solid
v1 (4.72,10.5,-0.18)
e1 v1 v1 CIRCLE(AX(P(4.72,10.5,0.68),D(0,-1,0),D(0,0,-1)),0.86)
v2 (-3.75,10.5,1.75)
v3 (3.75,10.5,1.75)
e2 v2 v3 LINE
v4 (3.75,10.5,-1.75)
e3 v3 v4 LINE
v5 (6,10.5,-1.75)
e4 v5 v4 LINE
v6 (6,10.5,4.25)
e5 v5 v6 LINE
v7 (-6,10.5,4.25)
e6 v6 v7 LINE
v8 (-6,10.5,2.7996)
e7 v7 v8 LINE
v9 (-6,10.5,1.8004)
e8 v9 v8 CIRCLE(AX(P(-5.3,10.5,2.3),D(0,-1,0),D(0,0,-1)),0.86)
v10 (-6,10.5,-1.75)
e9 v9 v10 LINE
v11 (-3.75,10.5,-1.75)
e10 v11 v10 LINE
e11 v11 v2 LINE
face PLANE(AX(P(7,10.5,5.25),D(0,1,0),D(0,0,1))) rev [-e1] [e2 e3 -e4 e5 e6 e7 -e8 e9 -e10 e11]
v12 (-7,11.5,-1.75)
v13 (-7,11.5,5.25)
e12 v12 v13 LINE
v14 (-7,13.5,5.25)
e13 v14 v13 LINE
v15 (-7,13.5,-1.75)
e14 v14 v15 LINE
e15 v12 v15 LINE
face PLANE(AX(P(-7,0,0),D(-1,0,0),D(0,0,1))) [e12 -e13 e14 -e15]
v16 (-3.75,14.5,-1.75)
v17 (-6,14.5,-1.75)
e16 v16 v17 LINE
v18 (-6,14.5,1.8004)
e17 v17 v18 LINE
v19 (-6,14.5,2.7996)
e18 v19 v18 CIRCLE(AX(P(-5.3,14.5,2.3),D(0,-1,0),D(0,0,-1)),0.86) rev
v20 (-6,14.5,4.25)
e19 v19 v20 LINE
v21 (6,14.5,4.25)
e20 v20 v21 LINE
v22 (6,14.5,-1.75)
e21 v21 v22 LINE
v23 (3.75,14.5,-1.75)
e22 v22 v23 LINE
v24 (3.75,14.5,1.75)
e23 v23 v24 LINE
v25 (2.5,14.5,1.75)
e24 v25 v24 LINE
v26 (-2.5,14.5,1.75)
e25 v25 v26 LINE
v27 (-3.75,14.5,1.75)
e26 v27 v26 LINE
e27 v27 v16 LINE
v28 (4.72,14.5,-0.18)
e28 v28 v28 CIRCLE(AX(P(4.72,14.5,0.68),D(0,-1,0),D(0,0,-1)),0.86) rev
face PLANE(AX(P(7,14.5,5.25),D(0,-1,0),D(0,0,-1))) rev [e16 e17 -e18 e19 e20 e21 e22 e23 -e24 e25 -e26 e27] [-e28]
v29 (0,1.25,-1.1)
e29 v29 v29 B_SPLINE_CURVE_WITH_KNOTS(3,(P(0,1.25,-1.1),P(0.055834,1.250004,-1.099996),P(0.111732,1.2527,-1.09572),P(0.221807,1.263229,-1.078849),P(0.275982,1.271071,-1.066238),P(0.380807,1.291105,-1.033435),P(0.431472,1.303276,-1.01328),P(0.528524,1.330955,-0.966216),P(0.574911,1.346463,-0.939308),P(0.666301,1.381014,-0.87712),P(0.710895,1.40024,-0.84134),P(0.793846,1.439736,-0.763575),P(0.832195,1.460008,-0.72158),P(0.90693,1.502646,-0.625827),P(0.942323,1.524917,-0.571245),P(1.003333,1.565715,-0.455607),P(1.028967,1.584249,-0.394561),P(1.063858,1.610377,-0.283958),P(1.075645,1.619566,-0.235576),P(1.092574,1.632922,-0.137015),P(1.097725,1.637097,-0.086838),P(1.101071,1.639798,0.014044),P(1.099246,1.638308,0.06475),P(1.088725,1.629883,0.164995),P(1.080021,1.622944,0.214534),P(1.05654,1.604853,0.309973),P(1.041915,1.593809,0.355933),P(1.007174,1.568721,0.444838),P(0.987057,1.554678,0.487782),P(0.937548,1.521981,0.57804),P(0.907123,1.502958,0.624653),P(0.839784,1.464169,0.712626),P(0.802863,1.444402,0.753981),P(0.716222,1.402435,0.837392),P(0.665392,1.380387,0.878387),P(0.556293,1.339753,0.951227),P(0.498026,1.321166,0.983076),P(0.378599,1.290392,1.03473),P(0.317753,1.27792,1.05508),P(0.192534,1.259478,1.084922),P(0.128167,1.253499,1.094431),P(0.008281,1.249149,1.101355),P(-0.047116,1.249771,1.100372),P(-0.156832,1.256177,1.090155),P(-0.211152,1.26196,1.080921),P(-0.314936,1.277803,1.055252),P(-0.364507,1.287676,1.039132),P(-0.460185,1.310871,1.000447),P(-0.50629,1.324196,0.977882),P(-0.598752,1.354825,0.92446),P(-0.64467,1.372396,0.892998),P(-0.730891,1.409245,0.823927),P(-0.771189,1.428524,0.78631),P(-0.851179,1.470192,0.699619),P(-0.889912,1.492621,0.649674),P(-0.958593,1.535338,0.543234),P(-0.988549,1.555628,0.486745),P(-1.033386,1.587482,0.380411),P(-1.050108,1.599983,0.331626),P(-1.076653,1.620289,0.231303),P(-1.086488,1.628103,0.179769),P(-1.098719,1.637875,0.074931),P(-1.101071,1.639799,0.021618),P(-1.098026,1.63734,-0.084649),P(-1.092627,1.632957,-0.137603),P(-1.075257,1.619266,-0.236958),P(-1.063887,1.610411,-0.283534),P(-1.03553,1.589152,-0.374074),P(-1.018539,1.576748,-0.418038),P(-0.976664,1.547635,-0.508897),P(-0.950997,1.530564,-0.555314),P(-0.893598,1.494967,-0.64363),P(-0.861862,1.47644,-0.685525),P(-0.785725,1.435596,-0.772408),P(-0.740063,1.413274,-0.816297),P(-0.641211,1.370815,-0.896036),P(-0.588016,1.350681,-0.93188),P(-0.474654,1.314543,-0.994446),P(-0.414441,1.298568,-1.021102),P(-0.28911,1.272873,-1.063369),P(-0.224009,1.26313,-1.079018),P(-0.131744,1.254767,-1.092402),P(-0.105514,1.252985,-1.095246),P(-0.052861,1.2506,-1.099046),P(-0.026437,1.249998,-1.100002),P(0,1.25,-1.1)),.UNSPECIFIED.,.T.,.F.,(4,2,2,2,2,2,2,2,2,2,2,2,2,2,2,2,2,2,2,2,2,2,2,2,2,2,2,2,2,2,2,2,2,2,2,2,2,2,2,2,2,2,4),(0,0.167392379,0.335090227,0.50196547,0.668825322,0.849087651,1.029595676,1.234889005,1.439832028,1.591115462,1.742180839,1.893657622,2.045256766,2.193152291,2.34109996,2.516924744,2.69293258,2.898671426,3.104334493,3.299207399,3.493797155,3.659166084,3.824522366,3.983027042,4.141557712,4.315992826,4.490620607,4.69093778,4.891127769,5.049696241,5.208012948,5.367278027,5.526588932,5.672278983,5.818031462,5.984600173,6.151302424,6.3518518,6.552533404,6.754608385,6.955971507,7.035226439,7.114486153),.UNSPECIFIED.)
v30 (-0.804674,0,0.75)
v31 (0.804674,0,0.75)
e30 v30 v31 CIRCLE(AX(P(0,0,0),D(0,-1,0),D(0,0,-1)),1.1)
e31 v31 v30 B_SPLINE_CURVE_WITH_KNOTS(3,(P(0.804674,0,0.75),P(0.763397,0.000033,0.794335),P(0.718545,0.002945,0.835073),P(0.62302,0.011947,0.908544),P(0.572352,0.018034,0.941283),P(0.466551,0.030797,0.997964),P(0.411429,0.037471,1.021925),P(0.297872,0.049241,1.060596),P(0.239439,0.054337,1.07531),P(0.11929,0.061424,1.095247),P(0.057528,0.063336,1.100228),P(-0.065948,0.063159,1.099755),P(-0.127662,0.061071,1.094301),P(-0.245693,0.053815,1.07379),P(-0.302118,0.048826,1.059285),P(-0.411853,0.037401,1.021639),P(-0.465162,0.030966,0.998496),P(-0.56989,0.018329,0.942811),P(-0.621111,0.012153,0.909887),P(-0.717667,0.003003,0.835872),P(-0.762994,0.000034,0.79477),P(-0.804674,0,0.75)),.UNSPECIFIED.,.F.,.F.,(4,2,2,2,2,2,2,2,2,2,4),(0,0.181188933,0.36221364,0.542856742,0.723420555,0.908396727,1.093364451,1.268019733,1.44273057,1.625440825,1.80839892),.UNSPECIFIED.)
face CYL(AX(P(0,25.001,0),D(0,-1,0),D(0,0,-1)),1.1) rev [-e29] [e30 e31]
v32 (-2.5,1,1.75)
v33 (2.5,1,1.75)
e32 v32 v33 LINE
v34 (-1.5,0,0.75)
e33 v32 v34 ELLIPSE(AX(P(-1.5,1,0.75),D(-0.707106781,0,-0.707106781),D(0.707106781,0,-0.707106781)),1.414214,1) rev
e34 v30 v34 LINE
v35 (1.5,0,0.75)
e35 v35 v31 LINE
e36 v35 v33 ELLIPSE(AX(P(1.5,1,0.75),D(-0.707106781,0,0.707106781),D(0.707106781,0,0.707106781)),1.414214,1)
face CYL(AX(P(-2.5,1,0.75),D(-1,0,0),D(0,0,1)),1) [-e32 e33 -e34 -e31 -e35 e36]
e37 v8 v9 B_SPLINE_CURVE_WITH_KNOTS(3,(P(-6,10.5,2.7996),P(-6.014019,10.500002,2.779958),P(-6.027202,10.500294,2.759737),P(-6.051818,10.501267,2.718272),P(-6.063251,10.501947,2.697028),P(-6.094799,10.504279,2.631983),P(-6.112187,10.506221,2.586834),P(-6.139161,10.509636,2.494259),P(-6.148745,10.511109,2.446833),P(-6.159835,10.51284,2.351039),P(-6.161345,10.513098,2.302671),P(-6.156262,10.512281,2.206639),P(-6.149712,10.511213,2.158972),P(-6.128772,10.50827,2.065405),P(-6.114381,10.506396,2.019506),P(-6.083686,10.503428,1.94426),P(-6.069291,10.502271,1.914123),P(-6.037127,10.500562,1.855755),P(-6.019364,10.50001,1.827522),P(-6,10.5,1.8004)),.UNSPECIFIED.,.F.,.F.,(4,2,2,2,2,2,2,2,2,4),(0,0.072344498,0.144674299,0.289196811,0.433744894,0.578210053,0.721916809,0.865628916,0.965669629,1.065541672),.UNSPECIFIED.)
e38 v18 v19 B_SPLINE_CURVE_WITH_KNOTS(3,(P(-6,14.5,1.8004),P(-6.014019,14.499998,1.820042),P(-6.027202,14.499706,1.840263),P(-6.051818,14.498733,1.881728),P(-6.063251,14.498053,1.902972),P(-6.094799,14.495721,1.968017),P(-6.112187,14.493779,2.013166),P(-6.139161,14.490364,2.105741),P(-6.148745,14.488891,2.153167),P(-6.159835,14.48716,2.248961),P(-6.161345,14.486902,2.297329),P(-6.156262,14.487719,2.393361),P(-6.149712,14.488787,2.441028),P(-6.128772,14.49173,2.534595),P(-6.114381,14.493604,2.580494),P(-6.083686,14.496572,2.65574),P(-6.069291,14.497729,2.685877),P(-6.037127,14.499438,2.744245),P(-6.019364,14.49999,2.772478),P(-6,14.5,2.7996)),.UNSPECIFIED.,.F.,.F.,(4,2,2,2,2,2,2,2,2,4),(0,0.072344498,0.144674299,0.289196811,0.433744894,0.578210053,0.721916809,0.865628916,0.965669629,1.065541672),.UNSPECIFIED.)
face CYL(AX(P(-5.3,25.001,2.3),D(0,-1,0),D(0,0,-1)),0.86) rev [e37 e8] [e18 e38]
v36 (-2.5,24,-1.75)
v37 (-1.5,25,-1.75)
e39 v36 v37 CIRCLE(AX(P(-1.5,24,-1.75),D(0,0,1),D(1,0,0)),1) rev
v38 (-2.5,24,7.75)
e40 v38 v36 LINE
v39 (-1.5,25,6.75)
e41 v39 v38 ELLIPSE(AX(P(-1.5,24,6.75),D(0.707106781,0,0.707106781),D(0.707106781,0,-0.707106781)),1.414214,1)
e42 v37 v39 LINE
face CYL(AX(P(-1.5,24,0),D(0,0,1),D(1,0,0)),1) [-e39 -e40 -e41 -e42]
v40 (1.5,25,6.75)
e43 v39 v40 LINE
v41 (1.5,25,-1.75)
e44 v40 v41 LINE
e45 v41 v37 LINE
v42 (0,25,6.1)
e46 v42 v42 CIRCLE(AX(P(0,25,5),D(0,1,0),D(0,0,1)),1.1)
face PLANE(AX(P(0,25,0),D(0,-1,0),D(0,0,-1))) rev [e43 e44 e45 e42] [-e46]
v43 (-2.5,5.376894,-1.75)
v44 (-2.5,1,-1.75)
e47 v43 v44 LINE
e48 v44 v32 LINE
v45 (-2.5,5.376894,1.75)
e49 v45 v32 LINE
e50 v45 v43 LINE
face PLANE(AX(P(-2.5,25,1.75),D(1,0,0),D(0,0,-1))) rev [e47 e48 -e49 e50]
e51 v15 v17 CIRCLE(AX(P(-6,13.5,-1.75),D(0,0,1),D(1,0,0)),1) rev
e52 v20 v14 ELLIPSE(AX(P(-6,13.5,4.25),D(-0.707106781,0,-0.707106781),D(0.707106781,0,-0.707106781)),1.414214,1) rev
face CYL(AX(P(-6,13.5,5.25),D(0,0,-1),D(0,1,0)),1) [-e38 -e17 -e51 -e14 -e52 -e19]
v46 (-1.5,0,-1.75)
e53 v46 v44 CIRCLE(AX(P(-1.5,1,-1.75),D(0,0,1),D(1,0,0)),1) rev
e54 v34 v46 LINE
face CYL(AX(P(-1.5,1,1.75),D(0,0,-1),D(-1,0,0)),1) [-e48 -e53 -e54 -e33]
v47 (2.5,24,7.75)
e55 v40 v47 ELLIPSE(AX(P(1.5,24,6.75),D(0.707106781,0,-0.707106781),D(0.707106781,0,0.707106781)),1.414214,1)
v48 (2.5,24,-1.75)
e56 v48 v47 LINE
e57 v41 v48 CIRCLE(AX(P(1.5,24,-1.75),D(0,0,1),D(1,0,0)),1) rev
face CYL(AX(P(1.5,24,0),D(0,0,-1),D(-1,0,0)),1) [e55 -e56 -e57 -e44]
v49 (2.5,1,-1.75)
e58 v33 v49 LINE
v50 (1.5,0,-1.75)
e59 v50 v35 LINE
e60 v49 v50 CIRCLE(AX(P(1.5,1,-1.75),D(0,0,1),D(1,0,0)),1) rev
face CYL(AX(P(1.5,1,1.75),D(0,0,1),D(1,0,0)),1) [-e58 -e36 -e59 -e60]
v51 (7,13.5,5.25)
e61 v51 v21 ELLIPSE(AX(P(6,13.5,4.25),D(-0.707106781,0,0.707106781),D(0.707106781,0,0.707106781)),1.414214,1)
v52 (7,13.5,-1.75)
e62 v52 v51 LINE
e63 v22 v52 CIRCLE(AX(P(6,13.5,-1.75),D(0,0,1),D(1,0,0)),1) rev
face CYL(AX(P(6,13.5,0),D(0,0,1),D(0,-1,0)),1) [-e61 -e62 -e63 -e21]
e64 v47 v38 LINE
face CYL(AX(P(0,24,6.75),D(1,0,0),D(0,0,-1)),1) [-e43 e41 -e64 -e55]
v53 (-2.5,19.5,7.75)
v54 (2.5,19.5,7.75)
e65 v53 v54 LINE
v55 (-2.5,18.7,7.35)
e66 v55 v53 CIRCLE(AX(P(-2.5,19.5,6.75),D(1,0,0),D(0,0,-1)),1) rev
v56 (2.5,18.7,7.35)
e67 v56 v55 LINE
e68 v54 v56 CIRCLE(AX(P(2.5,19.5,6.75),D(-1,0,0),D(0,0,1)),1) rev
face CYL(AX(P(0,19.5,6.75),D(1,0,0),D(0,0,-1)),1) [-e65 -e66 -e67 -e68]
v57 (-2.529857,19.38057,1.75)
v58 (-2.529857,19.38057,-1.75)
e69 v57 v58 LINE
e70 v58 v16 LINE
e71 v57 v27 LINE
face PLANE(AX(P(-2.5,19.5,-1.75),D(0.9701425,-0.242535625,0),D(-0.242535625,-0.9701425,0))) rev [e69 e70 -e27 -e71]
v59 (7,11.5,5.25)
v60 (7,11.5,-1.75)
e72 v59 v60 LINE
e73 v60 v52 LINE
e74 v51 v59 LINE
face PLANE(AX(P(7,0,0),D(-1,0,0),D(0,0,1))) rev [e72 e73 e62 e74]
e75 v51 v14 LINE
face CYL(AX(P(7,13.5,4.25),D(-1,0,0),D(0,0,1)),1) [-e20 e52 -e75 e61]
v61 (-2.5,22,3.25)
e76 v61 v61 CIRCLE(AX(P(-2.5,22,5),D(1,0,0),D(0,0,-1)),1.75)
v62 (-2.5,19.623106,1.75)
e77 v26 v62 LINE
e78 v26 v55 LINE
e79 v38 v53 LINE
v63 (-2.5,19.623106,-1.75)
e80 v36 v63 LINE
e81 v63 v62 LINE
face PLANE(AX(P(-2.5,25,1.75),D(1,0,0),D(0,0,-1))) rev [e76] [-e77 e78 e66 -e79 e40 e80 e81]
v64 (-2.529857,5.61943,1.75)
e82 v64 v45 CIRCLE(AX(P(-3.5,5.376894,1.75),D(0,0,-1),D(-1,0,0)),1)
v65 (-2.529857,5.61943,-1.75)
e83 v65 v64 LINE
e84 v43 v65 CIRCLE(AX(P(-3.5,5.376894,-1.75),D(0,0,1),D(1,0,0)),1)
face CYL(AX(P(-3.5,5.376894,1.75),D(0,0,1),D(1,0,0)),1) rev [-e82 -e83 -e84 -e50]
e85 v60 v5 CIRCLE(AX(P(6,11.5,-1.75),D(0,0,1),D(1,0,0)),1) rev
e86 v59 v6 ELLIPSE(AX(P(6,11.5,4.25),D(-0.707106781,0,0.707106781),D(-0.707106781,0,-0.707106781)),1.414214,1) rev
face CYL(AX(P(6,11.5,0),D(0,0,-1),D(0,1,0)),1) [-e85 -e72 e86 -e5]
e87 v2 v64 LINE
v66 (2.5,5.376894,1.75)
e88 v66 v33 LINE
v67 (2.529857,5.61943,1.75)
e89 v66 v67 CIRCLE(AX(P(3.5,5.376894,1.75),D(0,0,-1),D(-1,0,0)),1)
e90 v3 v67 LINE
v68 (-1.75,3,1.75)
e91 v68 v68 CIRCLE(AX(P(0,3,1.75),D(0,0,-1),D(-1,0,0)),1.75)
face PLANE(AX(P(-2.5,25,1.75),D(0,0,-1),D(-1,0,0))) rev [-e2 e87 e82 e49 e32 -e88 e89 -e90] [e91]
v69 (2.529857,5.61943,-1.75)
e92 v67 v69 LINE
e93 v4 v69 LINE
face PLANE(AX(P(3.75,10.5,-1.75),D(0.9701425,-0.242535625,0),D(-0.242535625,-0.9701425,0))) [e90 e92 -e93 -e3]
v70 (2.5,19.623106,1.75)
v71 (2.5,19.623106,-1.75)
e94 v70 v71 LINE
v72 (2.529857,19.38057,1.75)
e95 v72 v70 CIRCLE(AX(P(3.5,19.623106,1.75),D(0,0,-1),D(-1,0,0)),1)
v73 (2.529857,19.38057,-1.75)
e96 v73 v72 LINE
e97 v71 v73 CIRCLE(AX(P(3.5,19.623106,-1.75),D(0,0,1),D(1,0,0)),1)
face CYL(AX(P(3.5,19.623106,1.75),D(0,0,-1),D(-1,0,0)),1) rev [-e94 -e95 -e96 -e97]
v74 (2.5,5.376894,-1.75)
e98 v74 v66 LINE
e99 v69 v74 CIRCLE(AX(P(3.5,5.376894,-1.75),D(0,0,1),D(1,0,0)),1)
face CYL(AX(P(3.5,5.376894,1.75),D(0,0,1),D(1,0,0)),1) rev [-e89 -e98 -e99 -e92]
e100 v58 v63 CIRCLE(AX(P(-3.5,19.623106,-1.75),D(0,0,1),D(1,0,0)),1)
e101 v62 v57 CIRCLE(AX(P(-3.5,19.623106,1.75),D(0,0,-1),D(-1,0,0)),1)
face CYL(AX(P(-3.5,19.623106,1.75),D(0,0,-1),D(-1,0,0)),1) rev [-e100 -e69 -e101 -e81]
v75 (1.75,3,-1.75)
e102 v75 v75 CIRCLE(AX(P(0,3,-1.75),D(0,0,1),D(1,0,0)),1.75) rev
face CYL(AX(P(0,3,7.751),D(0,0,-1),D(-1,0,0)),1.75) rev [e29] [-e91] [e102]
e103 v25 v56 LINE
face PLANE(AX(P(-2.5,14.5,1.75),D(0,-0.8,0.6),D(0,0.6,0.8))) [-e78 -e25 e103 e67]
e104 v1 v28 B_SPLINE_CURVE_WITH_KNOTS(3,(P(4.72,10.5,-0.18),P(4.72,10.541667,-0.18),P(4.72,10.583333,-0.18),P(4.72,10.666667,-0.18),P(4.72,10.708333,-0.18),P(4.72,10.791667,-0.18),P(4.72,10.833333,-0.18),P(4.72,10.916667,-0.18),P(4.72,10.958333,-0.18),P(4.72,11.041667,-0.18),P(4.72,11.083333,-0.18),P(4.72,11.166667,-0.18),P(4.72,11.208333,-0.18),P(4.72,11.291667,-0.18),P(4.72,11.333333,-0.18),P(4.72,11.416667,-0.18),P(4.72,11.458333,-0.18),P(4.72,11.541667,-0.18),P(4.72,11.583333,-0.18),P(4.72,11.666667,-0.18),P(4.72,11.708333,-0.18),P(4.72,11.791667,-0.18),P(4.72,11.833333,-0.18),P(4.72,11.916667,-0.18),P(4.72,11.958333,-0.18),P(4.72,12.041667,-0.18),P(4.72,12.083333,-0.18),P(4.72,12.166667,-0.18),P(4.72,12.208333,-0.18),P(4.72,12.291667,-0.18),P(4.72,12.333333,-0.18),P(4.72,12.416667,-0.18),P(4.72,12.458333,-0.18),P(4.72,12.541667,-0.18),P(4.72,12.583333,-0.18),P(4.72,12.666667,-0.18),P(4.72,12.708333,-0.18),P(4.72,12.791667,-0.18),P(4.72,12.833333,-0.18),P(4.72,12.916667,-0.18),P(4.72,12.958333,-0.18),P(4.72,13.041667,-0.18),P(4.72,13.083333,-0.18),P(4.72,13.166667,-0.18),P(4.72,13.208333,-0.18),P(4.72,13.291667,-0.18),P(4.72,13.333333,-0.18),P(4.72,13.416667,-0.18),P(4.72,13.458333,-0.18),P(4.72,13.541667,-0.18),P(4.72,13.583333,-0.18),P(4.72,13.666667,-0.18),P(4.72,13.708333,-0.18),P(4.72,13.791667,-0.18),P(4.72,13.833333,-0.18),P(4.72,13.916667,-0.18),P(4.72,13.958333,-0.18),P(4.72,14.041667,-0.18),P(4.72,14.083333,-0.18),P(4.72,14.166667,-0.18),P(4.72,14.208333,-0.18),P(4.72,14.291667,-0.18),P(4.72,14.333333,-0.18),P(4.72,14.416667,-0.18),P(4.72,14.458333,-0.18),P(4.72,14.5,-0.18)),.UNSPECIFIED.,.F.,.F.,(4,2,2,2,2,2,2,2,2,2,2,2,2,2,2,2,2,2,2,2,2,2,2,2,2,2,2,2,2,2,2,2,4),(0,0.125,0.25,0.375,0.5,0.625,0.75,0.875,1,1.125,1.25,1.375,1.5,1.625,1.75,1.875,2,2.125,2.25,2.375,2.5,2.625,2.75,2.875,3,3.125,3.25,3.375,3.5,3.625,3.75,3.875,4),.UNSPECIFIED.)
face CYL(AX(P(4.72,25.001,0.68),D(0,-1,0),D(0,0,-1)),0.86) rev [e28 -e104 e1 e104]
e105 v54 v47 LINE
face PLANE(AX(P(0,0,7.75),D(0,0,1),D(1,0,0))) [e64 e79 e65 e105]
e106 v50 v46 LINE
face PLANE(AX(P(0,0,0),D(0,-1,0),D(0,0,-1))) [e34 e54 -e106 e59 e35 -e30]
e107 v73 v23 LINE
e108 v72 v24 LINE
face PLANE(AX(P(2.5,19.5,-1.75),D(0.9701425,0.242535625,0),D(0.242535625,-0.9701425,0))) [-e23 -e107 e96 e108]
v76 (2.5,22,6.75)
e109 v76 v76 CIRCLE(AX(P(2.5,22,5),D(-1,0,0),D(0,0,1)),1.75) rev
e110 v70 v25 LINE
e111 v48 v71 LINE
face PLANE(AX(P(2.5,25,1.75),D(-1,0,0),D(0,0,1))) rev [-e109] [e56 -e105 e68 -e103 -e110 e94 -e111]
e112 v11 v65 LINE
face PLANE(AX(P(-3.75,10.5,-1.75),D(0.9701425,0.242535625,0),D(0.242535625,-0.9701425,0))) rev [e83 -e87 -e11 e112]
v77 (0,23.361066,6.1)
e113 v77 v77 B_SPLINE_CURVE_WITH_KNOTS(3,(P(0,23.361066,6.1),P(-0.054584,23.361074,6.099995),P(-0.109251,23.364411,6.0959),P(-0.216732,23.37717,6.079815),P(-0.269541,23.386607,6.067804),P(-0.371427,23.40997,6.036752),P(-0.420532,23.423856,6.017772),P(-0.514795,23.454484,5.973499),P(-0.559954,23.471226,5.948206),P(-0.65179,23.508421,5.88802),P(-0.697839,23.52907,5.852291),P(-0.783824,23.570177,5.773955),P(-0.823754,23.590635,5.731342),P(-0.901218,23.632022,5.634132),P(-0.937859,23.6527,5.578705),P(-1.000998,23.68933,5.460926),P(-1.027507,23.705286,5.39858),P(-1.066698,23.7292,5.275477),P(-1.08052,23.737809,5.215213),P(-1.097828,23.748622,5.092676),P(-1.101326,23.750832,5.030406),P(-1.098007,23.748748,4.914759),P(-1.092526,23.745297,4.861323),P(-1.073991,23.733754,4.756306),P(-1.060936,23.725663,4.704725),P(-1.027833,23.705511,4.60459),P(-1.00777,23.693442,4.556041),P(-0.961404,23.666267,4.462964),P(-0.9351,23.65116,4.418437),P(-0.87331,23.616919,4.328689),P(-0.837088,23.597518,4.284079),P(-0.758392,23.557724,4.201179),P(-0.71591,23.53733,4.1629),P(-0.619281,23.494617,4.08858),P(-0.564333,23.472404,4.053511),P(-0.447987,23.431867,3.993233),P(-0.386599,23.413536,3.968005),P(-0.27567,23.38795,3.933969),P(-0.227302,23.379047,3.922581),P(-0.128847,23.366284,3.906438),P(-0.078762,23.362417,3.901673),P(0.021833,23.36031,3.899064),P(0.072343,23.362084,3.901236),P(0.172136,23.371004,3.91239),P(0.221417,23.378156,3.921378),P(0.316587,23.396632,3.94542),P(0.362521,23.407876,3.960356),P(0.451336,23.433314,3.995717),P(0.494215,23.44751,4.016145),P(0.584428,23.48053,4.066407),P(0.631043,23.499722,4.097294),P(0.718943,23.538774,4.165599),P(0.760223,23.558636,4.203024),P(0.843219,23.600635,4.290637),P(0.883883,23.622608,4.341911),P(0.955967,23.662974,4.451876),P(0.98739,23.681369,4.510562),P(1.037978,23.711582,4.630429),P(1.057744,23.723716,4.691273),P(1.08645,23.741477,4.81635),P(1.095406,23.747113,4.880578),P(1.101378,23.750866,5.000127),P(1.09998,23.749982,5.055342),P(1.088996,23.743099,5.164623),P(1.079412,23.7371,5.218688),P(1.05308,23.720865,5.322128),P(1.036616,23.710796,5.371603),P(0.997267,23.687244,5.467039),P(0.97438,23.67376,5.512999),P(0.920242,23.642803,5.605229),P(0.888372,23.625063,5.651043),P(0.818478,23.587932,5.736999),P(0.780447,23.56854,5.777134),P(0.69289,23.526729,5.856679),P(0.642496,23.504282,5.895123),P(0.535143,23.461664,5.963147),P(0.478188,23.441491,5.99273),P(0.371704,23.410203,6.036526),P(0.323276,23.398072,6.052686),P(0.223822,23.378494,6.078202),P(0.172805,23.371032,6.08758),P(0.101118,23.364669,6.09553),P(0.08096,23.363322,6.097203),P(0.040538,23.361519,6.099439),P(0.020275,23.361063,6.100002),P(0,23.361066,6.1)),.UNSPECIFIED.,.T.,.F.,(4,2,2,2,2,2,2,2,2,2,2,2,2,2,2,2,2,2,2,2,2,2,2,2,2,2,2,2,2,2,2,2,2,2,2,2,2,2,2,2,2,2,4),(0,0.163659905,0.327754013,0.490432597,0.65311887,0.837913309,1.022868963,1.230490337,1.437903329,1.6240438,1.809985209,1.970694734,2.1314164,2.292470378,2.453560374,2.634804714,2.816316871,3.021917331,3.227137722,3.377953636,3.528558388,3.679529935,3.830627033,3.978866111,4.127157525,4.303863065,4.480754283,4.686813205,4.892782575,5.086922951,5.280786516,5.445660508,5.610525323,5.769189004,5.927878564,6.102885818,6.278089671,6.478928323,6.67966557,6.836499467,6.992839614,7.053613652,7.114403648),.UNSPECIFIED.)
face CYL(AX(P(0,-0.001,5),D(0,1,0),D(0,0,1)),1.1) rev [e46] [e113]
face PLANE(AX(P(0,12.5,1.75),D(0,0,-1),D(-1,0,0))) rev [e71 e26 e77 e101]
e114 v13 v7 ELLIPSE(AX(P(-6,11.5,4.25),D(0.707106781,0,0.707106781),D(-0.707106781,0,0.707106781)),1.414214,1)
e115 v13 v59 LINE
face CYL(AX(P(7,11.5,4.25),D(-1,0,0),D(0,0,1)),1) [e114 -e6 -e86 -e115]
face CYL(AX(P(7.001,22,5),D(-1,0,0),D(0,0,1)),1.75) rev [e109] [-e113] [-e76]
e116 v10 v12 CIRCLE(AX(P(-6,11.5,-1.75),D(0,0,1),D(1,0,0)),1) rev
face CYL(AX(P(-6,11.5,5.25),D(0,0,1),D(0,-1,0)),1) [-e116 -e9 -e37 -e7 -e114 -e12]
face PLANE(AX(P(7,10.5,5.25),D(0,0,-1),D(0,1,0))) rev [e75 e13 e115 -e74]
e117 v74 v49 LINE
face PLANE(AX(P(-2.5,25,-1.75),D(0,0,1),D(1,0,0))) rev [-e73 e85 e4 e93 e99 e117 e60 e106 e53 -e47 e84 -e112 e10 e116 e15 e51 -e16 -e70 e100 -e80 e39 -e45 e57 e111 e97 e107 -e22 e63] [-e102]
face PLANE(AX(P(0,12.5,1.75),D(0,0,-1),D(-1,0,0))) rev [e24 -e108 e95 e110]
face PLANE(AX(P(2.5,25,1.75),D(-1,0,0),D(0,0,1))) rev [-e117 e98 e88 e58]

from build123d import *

# Parameters (mm, degrees)
SKETCH4_W                      = 5
SKETCH4_H                      = 3.5
BOSS_EXTRUDE4_DEPTH            = 25
SKETCH8_W                      = 5
SKETCH8_H                      = 6
BOSS_EXTRUDE6_DEPTH            = 6
BOSS_EXTRUDE8_DEPTH            = 7
BOSS_EXTRUDE8_DEPTH_BACK       = 7
SKETCH10_W                     = 7
SKETCH10_H                     = 4
CUT_EXTRUDE1_REACH             = 19.869
SKETCH11_R                     = 0.86
CUT_EXTRUDE3_REACH             = 29.094
SKETCH5_R                      = 1.75
CUT_EXTRUDE3_DIRECTION_2_REACH = 29.094
CUT_EXTRUDE2_REACH             = 29.094
SKETCH9_R                      = 1.75
CUT_EXTRUDE2_DIRECTION_2_REACH = 29.094
CUT_EXTRUDE4_REACH             = 29.094
CUT_EXTRUDE4_END_RADIUS        = 1.75
SKETCH13_R                     = 1.1
CUT_EXTRUDE5_REACH             = 29.094
CUT_EXTRUDE5_END_RADIUS        = 1.75
SKETCH14_R                     = 1.1
RIB5_REACH                     = 29.844
SKETCH19_WALL_W                = 65.188868008
SKETCH19_WALL_H                = 5
RIB8_REACH                     = 29.645
SKETCH20_WALL_W                = 62.444026
SKETCH20_WALL_H                = 3.5
RIB9_REACH                     = 29.645
SKETCH21_WALL_W                = 62.444026
SKETCH21_WALL_H                = 3.5
FILLET2_R                      = 1


with BuildPart() as part:
    # Sketch4 → Boss-Extrude4 (new body)
    with BuildSketch(Plane(origin=(0, 0, 0), x_dir=(1, 0, 0), z_dir=(0, 1, 0))):
        Rectangle(SKETCH4_W, SKETCH4_H)
    extrude(amount=BOSS_EXTRUDE4_DEPTH)

    # Sketch8 → Boss-Extrude6 (add)
    with BuildSketch(Plane.XY.offset(1.75)):
        with Locations((0, 22)):
            Rectangle(SKETCH8_W, SKETCH8_H)
    extrude(amount=BOSS_EXTRUDE6_DEPTH)

    # Sketch10 → Boss-Extrude8 (add, two sides: drawn at the far end of the back side and taken through both)
    with BuildSketch(Plane(origin=(0, 0, 0), x_dir=(0, 0, -1), z_dir=(1, 0, 0)).offset(-BOSS_EXTRUDE8_DEPTH_BACK)):
        with Locations((-1.75, 12.5)):
            Rectangle(SKETCH10_W, SKETCH10_H)
    extrude(amount=BOSS_EXTRUDE8_DEPTH + BOSS_EXTRUDE8_DEPTH_BACK)

    # Sketch11 → Cut-Extrude1 (cut, up to next)
    with BuildSketch(Plane.XZ.offset(-10.5), mode=Mode.PRIVATE) as cut_extrude1_sk1:
        with Locations(Location((-5.3, 2.3, 0), (0, 0, 270))):
            Circle(SKETCH11_R)
    cut_extrude1_tool1 = extrude(cut_extrude1_sk1.sketch, amount=-CUT_EXTRUDE1_REACH, mode=Mode.PRIVATE) & part.part
    # Sketch11 → Cut-Extrude1 (cut, up to next)
    with BuildSketch(Plane.XZ.offset(-10.5), mode=Mode.PRIVATE) as cut_extrude1_sk2:
        with Locations(Location((4.72, 0.68, 0), (0, 0, 270))):
            Circle(SKETCH11_R)
    cut_extrude1_tool2 = extrude(cut_extrude1_sk2.sketch, amount=-CUT_EXTRUDE1_REACH, mode=Mode.PRIVATE) & part.part
    add(cut_extrude1_tool1.solids().sort_by_distance((-5.3, 10.5, 2.3))[0], mode=Mode.SUBTRACT)
    add(cut_extrude1_tool2.solids().sort_by_distance((4.72, 10.5, 0.68))[0], mode=Mode.SUBTRACT)

    # Sketch5 → Cut-Extrude3 (cut, up to next)
    with BuildSketch(Plane.XY, mode=Mode.PRIVATE) as cut_extrude3_sk1:
        with Locations(Location((0, 3, 0), (0, 0, 180))):
            Circle(SKETCH5_R)
    cut_extrude3_tool1 = extrude(cut_extrude3_sk1.sketch, amount=-CUT_EXTRUDE3_REACH, mode=Mode.PRIVATE) & part.part
    add(cut_extrude3_tool1.solids().sort_by_distance((0, 3, 0))[0], mode=Mode.SUBTRACT)

    # Sketch5 → Cut-Extrude3 direction 2 (cut, up to next)
    with BuildSketch(Plane.XY, mode=Mode.PRIVATE) as cut_extrude3_direction_2_sk1:
        with Locations(Location((0, 3, 0), (0, 0, 180))):
            Circle(SKETCH5_R)
    cut_extrude3_direction_2_tool1 = extrude(cut_extrude3_direction_2_sk1.sketch, amount=CUT_EXTRUDE3_DIRECTION_2_REACH, mode=Mode.PRIVATE) & part.part
    add(cut_extrude3_direction_2_tool1.solids().sort_by_distance((0, 3, 0))[0], mode=Mode.SUBTRACT)

    # Sketch9 → Cut-Extrude2 (cut, up to next)
    with BuildSketch(Plane.ZY, mode=Mode.PRIVATE) as cut_extrude2_sk1:
        with Locations((5, 22)):
            Circle(SKETCH9_R)
    cut_extrude2_tool1 = extrude(cut_extrude2_sk1.sketch, amount=CUT_EXTRUDE2_REACH, mode=Mode.PRIVATE) & part.part
    add(cut_extrude2_tool1.solids().sort_by_distance((0, 22, 5))[0], mode=Mode.SUBTRACT)

    # Sketch9 → Cut-Extrude2 direction 2 (cut, up to next)
    with BuildSketch(Plane.ZY, mode=Mode.PRIVATE) as cut_extrude2_direction_2_sk1:
        with Locations((5, 22)):
            Circle(SKETCH9_R)
    cut_extrude2_direction_2_tool1 = extrude(cut_extrude2_direction_2_sk1.sketch, amount=-CUT_EXTRUDE2_DIRECTION_2_REACH, mode=Mode.PRIVATE) & part.part
    add(cut_extrude2_direction_2_tool1.solids().sort_by_distance((0, 22, 5))[0], mode=Mode.SUBTRACT)

    # Cut-Extrude4: up to this cylinder (the profile starts outside it)
    cut_extrude4_end = Plane(origin=(0, 22, 5), z_dir=(-1, 0, 0)) * Cylinder(CUT_EXTRUDE4_END_RADIUS, 62.688, mode=Mode.PRIVATE)
    # Sketch13 → Cut-Extrude4 (cut, up to the surface)
    with BuildSketch(Plane(origin=(0, 25, 0), x_dir=(1, 0, 0), z_dir=(0, 1, 0)), mode=Mode.PRIVATE) as cut_extrude4_sk1:
        with Locations(Location((0, -5, 0), (0, 0, 270))):
            Circle(SKETCH13_R)
    cut_extrude4_tool1 = extrude(cut_extrude4_sk1.sketch, amount=-CUT_EXTRUDE4_REACH, mode=Mode.PRIVATE) - cut_extrude4_end
    add(cut_extrude4_tool1.solids().sort_by_distance((0, 25, 5))[0], mode=Mode.SUBTRACT)

    # Cut-Extrude5: up to this cylinder (the profile starts outside it)
    cut_extrude5_end = Plane(origin=(0, 3, 0), z_dir=(0, 0, -1)) * Cylinder(CUT_EXTRUDE5_END_RADIUS, 62.688, mode=Mode.PRIVATE)
    # Sketch14 → Cut-Extrude5 (cut, up to the surface)
    with BuildSketch(Plane.XZ, mode=Mode.PRIVATE) as cut_extrude5_sk1:
        with Locations(Location((0, 0, 0), (0, 0, 270))):
            Circle(SKETCH14_R)
    cut_extrude5_tool1 = extrude(cut_extrude5_sk1.sketch, amount=-CUT_EXTRUDE5_REACH, mode=Mode.PRIVATE) - cut_extrude5_end
    add(cut_extrude5_tool1.solids().sort_by_distance((0, 0, 0))[0], mode=Mode.SUBTRACT)

    # Sketch19 wall → Rib5 (add, up to next)
    with BuildSketch(Plane(origin=(-2.5, 16.75, 4.75), x_dir=(0, 0.6, 0.8), z_dir=(0, 0.8, -0.6)), mode=Mode.PRIVATE) as rib5_sk1:
        with Locations((0, 2.5)):
            Rectangle(SKETCH19_WALL_W, SKETCH19_WALL_H)
    rib5_tool1 = extrude(rib5_sk1.sketch, amount=RIB5_REACH, mode=Mode.PRIVATE) - part.part
    add(rib5_tool1.solids().sort_by_distance((-2.5, 16.75, 4.75))[0])

    # Sketch20 wall → Rib8 (add, up to next)
    with BuildSketch(Plane(origin=(-3.125, 17, -1.75), x_dir=(-0.242535625036, -0.970142500145, 0), z_dir=(-0.970142500145, 0.242535625036, 0)), mode=Mode.PRIVATE) as rib8_sk1:
        with Locations((0, 1.75)):
            Rectangle(SKETCH20_WALL_W, SKETCH20_WALL_H)
    rib8_tool1 = extrude(rib8_sk1.sketch, amount=-RIB8_REACH, mode=Mode.PRIVATE) - part.part
    rib8 = rib8_tool1.solids().sort_by_distance((-3.125, 17, -1.75))[0]
    add(rib8)

    # Sketch21 wall → Rib9 (add, up to next)
    with BuildSketch(Plane(origin=(-3.125, 8, -1.75), x_dir=(0.242535625036, -0.970142500145, 0), z_dir=(-0.970142500145, -0.242535625036, 0)), mode=Mode.PRIVATE) as rib9_sk1:
        with Locations((0, 1.75)):
            Rectangle(SKETCH21_WALL_W, SKETCH21_WALL_H)
    rib9_tool1 = extrude(rib9_sk1.sketch, amount=-RIB9_REACH, mode=Mode.PRIVATE) - part.part
    rib9 = rib9_tool1.solids().sort_by_distance((-3.125, 8, -1.75))[0]
    add(rib9)

    # Mirror3: Rib8, Rib9 across plane
    add(rib8.mirror(Plane(origin=(0, 0, 0), x_dir=(0, 0, 1), z_dir=(1, 0, 0))))
    add(rib9.mirror(Plane(origin=(0, 0, 0), x_dir=(0, 0, 1), z_dir=(1, 0, 0))))

    # Fillet2
    # the kernel refuses this fillet: 1 mm, written as the material it adds along each edge
    with BuildSketch(Plane(origin=(-2.5, 19.5, 1.75), x_dir=(-0.2425356250360274, -0.9701425001454083, 0), z_dir=(0, 0, -1)), Plane(origin=(-2.5, 5.5, -1.75), x_dir=(-0.24253562503611567, 0.9701425001453862, 0), z_dir=(0, 0, 1)), Plane(origin=(2.5, 5.5, -1.75), x_dir=(0, -1, 0), z_dir=(0, 0, 1))) as fillet2_piece_1:
        with BuildLine():
            CenterArc((FILLET2_R * 0.123105625617, FILLET2_R), FILLET2_R, 255.963756532, 14.036243468)
            Line((-FILLET2_R * 0.119429999419, FILLET2_R * 0.0298574998546), (0, 0))
            Line((0, 0), (FILLET2_R * 0.123105625618, 0))
        make_face()
    fillet2_piece_1_solid = extrude(amount=3.5, mode=Mode.PRIVATE)
    with BuildSketch(Plane(origin=(2.5, 19.5, 1.75), x_dir=(0.24253562503603418, -0.9701425001454065, 0), z_dir=(0, 0, -1))) as fillet2_piece_2:
        with BuildLine():
            CenterArc((FILLET2_R * 0.123105625617, -FILLET2_R), FILLET2_R, 90, 14.036243468)
            Line((-FILLET2_R * 0.119429999419, -FILLET2_R * 0.0298574998546), (0, 0))
            Line((0, 0), (FILLET2_R * 0.123105625618, 0))
        make_face()
    fillet2_piece_2_solid = extrude(amount=3.5, mode=Mode.PRIVATE)
    add([fillet2_piece_1_solid, fillet2_piece_2_solid])
    # the kernel refuses this fillet: 1 mm, written as the material it takes off along each edge
    with BuildSketch(Plane(origin=(-2.5, 25, 10.25), x_dir=(0, -1, 0), z_dir=(0, 0, -1)), Plane(origin=(2.5, 25, -4.25), x_dir=(0, -1, 0), z_dir=(0, 0, 1))) as fillet2_2_piece_1:
        with BuildLine():
            CenterArc((FILLET2_R, -FILLET2_R), FILLET2_R, 90, 90)
            Line((0, -FILLET2_R), (0, 0))
            Line((0, 0), (FILLET2_R, 0))
        make_face()
    fillet2_2_piece_1_solid = extrude(amount=14.5, mode=Mode.PRIVATE)
    with BuildSketch(Plane(origin=(3.75, 19, 7.75), x_dir=(0, -0.5999999999999996, -0.8000000000000002), z_dir=(-1, 0, 0))) as fillet2_2_piece_2:
        with BuildLine():
            CenterArc((FILLET2_R * 0.5, -FILLET2_R), FILLET2_R, 90, 53.130102354)
            Line((-FILLET2_R * 0.3, -FILLET2_R * 0.4), (0, 0))
            Line((0, 0), (FILLET2_R * 0.5, 0))
        make_face()
    fillet2_2_piece_2_solid = extrude(amount=7.5, mode=Mode.PRIVATE)
    with BuildSketch(Plane(origin=(-5, 25, 7.75), x_dir=(0, 0, -1), z_dir=(1, 0, 0)), Plane(origin=(-5, 0, 1.75), x_dir=(0, 1, 0), z_dir=(1, 0, 0))) as fillet2_2_piece_3:
        with BuildLine():
            CenterArc((FILLET2_R, -FILLET2_R), FILLET2_R, 90, 90)
            Line((0, -FILLET2_R), (0, 0))
            Line((0, 0), (FILLET2_R, 0))
        make_face()
    fillet2_2_piece_3_solid = extrude(amount=10, mode=Mode.PRIVATE)
    with BuildSketch(Plane(origin=(-7, 14.5, -4.25), x_dir=(0, -1, 0), z_dir=(0, 0, 1)), Plane(origin=(7, 10.5, 7.75), x_dir=(-1, 0, 0), z_dir=(0, 0, -1))) as fillet2_2_piece_4:
        with BuildLine():
            CenterArc((FILLET2_R, FILLET2_R), FILLET2_R, 180, 90)
            Line((0, FILLET2_R), (0, 0))
            Line((0, 0), (FILLET2_R, 0))
        make_face()
    fillet2_2_piece_4_solid = extrude(amount=12, mode=Mode.PRIVATE)
    with BuildSketch(Plane(origin=(9.5, 10.5, 5.25), x_dir=(0, 0, -1), z_dir=(-1, 0, 0)), Plane(origin=(9.5, 14.5, 5.25), x_dir=(0, -1, 0), z_dir=(-1, 0, 0))) as fillet2_2_piece_5:
        with BuildLine():
            CenterArc((FILLET2_R, -FILLET2_R), FILLET2_R, 90, 90)
            Line((0, -FILLET2_R), (0, 0))
            Line((0, 0), (FILLET2_R, 0))
        make_face()
    fillet2_2_piece_5_solid = extrude(amount=19, mode=Mode.PRIVATE)
    with BuildSketch(Plane(origin=(-7, 10.5, 7.75), x_dir=(1, 0, 0), z_dir=(0, 0, -1)), Plane(origin=(7, 14.5, -4.25), x_dir=(0, -1, 0), z_dir=(0, 0, 1))) as fillet2_2_piece_6:
        with BuildLine():
            CenterArc((FILLET2_R, -FILLET2_R), FILLET2_R, 90, 90)
            Line((0, -FILLET2_R), (0, 0))
            Line((0, 0), (FILLET2_R, 0))
        make_face()
    fillet2_2_piece_6_solid = extrude(amount=12, mode=Mode.PRIVATE)
    with BuildSketch(Plane(origin=(-2.5, 0, -4.25), x_dir=(1, 0, 0), z_dir=(0, 0, 1)), Plane(origin=(2.5, 0, 4.25), x_dir=(-1, 0, 0), z_dir=(0, 0, -1))) as fillet2_2_piece_7:
        with BuildLine():
            CenterArc((FILLET2_R, FILLET2_R), FILLET2_R, 180, 90)
            Line((0, FILLET2_R), (0, 0))
            Line((0, 0), (FILLET2_R, 0))
        make_face()
    fillet2_2_piece_7_solid = extrude(amount=8.5, mode=Mode.PRIVATE)
    add([fillet2_2_piece_1_solid, fillet2_2_piece_2_solid, fillet2_2_piece_3_solid, fillet2_2_piece_4_solid, fillet2_2_piece_5_solid, fillet2_2_piece_6_solid, fillet2_2_piece_7_solid], mode=Mode.SUBTRACT)


solid = part.part
